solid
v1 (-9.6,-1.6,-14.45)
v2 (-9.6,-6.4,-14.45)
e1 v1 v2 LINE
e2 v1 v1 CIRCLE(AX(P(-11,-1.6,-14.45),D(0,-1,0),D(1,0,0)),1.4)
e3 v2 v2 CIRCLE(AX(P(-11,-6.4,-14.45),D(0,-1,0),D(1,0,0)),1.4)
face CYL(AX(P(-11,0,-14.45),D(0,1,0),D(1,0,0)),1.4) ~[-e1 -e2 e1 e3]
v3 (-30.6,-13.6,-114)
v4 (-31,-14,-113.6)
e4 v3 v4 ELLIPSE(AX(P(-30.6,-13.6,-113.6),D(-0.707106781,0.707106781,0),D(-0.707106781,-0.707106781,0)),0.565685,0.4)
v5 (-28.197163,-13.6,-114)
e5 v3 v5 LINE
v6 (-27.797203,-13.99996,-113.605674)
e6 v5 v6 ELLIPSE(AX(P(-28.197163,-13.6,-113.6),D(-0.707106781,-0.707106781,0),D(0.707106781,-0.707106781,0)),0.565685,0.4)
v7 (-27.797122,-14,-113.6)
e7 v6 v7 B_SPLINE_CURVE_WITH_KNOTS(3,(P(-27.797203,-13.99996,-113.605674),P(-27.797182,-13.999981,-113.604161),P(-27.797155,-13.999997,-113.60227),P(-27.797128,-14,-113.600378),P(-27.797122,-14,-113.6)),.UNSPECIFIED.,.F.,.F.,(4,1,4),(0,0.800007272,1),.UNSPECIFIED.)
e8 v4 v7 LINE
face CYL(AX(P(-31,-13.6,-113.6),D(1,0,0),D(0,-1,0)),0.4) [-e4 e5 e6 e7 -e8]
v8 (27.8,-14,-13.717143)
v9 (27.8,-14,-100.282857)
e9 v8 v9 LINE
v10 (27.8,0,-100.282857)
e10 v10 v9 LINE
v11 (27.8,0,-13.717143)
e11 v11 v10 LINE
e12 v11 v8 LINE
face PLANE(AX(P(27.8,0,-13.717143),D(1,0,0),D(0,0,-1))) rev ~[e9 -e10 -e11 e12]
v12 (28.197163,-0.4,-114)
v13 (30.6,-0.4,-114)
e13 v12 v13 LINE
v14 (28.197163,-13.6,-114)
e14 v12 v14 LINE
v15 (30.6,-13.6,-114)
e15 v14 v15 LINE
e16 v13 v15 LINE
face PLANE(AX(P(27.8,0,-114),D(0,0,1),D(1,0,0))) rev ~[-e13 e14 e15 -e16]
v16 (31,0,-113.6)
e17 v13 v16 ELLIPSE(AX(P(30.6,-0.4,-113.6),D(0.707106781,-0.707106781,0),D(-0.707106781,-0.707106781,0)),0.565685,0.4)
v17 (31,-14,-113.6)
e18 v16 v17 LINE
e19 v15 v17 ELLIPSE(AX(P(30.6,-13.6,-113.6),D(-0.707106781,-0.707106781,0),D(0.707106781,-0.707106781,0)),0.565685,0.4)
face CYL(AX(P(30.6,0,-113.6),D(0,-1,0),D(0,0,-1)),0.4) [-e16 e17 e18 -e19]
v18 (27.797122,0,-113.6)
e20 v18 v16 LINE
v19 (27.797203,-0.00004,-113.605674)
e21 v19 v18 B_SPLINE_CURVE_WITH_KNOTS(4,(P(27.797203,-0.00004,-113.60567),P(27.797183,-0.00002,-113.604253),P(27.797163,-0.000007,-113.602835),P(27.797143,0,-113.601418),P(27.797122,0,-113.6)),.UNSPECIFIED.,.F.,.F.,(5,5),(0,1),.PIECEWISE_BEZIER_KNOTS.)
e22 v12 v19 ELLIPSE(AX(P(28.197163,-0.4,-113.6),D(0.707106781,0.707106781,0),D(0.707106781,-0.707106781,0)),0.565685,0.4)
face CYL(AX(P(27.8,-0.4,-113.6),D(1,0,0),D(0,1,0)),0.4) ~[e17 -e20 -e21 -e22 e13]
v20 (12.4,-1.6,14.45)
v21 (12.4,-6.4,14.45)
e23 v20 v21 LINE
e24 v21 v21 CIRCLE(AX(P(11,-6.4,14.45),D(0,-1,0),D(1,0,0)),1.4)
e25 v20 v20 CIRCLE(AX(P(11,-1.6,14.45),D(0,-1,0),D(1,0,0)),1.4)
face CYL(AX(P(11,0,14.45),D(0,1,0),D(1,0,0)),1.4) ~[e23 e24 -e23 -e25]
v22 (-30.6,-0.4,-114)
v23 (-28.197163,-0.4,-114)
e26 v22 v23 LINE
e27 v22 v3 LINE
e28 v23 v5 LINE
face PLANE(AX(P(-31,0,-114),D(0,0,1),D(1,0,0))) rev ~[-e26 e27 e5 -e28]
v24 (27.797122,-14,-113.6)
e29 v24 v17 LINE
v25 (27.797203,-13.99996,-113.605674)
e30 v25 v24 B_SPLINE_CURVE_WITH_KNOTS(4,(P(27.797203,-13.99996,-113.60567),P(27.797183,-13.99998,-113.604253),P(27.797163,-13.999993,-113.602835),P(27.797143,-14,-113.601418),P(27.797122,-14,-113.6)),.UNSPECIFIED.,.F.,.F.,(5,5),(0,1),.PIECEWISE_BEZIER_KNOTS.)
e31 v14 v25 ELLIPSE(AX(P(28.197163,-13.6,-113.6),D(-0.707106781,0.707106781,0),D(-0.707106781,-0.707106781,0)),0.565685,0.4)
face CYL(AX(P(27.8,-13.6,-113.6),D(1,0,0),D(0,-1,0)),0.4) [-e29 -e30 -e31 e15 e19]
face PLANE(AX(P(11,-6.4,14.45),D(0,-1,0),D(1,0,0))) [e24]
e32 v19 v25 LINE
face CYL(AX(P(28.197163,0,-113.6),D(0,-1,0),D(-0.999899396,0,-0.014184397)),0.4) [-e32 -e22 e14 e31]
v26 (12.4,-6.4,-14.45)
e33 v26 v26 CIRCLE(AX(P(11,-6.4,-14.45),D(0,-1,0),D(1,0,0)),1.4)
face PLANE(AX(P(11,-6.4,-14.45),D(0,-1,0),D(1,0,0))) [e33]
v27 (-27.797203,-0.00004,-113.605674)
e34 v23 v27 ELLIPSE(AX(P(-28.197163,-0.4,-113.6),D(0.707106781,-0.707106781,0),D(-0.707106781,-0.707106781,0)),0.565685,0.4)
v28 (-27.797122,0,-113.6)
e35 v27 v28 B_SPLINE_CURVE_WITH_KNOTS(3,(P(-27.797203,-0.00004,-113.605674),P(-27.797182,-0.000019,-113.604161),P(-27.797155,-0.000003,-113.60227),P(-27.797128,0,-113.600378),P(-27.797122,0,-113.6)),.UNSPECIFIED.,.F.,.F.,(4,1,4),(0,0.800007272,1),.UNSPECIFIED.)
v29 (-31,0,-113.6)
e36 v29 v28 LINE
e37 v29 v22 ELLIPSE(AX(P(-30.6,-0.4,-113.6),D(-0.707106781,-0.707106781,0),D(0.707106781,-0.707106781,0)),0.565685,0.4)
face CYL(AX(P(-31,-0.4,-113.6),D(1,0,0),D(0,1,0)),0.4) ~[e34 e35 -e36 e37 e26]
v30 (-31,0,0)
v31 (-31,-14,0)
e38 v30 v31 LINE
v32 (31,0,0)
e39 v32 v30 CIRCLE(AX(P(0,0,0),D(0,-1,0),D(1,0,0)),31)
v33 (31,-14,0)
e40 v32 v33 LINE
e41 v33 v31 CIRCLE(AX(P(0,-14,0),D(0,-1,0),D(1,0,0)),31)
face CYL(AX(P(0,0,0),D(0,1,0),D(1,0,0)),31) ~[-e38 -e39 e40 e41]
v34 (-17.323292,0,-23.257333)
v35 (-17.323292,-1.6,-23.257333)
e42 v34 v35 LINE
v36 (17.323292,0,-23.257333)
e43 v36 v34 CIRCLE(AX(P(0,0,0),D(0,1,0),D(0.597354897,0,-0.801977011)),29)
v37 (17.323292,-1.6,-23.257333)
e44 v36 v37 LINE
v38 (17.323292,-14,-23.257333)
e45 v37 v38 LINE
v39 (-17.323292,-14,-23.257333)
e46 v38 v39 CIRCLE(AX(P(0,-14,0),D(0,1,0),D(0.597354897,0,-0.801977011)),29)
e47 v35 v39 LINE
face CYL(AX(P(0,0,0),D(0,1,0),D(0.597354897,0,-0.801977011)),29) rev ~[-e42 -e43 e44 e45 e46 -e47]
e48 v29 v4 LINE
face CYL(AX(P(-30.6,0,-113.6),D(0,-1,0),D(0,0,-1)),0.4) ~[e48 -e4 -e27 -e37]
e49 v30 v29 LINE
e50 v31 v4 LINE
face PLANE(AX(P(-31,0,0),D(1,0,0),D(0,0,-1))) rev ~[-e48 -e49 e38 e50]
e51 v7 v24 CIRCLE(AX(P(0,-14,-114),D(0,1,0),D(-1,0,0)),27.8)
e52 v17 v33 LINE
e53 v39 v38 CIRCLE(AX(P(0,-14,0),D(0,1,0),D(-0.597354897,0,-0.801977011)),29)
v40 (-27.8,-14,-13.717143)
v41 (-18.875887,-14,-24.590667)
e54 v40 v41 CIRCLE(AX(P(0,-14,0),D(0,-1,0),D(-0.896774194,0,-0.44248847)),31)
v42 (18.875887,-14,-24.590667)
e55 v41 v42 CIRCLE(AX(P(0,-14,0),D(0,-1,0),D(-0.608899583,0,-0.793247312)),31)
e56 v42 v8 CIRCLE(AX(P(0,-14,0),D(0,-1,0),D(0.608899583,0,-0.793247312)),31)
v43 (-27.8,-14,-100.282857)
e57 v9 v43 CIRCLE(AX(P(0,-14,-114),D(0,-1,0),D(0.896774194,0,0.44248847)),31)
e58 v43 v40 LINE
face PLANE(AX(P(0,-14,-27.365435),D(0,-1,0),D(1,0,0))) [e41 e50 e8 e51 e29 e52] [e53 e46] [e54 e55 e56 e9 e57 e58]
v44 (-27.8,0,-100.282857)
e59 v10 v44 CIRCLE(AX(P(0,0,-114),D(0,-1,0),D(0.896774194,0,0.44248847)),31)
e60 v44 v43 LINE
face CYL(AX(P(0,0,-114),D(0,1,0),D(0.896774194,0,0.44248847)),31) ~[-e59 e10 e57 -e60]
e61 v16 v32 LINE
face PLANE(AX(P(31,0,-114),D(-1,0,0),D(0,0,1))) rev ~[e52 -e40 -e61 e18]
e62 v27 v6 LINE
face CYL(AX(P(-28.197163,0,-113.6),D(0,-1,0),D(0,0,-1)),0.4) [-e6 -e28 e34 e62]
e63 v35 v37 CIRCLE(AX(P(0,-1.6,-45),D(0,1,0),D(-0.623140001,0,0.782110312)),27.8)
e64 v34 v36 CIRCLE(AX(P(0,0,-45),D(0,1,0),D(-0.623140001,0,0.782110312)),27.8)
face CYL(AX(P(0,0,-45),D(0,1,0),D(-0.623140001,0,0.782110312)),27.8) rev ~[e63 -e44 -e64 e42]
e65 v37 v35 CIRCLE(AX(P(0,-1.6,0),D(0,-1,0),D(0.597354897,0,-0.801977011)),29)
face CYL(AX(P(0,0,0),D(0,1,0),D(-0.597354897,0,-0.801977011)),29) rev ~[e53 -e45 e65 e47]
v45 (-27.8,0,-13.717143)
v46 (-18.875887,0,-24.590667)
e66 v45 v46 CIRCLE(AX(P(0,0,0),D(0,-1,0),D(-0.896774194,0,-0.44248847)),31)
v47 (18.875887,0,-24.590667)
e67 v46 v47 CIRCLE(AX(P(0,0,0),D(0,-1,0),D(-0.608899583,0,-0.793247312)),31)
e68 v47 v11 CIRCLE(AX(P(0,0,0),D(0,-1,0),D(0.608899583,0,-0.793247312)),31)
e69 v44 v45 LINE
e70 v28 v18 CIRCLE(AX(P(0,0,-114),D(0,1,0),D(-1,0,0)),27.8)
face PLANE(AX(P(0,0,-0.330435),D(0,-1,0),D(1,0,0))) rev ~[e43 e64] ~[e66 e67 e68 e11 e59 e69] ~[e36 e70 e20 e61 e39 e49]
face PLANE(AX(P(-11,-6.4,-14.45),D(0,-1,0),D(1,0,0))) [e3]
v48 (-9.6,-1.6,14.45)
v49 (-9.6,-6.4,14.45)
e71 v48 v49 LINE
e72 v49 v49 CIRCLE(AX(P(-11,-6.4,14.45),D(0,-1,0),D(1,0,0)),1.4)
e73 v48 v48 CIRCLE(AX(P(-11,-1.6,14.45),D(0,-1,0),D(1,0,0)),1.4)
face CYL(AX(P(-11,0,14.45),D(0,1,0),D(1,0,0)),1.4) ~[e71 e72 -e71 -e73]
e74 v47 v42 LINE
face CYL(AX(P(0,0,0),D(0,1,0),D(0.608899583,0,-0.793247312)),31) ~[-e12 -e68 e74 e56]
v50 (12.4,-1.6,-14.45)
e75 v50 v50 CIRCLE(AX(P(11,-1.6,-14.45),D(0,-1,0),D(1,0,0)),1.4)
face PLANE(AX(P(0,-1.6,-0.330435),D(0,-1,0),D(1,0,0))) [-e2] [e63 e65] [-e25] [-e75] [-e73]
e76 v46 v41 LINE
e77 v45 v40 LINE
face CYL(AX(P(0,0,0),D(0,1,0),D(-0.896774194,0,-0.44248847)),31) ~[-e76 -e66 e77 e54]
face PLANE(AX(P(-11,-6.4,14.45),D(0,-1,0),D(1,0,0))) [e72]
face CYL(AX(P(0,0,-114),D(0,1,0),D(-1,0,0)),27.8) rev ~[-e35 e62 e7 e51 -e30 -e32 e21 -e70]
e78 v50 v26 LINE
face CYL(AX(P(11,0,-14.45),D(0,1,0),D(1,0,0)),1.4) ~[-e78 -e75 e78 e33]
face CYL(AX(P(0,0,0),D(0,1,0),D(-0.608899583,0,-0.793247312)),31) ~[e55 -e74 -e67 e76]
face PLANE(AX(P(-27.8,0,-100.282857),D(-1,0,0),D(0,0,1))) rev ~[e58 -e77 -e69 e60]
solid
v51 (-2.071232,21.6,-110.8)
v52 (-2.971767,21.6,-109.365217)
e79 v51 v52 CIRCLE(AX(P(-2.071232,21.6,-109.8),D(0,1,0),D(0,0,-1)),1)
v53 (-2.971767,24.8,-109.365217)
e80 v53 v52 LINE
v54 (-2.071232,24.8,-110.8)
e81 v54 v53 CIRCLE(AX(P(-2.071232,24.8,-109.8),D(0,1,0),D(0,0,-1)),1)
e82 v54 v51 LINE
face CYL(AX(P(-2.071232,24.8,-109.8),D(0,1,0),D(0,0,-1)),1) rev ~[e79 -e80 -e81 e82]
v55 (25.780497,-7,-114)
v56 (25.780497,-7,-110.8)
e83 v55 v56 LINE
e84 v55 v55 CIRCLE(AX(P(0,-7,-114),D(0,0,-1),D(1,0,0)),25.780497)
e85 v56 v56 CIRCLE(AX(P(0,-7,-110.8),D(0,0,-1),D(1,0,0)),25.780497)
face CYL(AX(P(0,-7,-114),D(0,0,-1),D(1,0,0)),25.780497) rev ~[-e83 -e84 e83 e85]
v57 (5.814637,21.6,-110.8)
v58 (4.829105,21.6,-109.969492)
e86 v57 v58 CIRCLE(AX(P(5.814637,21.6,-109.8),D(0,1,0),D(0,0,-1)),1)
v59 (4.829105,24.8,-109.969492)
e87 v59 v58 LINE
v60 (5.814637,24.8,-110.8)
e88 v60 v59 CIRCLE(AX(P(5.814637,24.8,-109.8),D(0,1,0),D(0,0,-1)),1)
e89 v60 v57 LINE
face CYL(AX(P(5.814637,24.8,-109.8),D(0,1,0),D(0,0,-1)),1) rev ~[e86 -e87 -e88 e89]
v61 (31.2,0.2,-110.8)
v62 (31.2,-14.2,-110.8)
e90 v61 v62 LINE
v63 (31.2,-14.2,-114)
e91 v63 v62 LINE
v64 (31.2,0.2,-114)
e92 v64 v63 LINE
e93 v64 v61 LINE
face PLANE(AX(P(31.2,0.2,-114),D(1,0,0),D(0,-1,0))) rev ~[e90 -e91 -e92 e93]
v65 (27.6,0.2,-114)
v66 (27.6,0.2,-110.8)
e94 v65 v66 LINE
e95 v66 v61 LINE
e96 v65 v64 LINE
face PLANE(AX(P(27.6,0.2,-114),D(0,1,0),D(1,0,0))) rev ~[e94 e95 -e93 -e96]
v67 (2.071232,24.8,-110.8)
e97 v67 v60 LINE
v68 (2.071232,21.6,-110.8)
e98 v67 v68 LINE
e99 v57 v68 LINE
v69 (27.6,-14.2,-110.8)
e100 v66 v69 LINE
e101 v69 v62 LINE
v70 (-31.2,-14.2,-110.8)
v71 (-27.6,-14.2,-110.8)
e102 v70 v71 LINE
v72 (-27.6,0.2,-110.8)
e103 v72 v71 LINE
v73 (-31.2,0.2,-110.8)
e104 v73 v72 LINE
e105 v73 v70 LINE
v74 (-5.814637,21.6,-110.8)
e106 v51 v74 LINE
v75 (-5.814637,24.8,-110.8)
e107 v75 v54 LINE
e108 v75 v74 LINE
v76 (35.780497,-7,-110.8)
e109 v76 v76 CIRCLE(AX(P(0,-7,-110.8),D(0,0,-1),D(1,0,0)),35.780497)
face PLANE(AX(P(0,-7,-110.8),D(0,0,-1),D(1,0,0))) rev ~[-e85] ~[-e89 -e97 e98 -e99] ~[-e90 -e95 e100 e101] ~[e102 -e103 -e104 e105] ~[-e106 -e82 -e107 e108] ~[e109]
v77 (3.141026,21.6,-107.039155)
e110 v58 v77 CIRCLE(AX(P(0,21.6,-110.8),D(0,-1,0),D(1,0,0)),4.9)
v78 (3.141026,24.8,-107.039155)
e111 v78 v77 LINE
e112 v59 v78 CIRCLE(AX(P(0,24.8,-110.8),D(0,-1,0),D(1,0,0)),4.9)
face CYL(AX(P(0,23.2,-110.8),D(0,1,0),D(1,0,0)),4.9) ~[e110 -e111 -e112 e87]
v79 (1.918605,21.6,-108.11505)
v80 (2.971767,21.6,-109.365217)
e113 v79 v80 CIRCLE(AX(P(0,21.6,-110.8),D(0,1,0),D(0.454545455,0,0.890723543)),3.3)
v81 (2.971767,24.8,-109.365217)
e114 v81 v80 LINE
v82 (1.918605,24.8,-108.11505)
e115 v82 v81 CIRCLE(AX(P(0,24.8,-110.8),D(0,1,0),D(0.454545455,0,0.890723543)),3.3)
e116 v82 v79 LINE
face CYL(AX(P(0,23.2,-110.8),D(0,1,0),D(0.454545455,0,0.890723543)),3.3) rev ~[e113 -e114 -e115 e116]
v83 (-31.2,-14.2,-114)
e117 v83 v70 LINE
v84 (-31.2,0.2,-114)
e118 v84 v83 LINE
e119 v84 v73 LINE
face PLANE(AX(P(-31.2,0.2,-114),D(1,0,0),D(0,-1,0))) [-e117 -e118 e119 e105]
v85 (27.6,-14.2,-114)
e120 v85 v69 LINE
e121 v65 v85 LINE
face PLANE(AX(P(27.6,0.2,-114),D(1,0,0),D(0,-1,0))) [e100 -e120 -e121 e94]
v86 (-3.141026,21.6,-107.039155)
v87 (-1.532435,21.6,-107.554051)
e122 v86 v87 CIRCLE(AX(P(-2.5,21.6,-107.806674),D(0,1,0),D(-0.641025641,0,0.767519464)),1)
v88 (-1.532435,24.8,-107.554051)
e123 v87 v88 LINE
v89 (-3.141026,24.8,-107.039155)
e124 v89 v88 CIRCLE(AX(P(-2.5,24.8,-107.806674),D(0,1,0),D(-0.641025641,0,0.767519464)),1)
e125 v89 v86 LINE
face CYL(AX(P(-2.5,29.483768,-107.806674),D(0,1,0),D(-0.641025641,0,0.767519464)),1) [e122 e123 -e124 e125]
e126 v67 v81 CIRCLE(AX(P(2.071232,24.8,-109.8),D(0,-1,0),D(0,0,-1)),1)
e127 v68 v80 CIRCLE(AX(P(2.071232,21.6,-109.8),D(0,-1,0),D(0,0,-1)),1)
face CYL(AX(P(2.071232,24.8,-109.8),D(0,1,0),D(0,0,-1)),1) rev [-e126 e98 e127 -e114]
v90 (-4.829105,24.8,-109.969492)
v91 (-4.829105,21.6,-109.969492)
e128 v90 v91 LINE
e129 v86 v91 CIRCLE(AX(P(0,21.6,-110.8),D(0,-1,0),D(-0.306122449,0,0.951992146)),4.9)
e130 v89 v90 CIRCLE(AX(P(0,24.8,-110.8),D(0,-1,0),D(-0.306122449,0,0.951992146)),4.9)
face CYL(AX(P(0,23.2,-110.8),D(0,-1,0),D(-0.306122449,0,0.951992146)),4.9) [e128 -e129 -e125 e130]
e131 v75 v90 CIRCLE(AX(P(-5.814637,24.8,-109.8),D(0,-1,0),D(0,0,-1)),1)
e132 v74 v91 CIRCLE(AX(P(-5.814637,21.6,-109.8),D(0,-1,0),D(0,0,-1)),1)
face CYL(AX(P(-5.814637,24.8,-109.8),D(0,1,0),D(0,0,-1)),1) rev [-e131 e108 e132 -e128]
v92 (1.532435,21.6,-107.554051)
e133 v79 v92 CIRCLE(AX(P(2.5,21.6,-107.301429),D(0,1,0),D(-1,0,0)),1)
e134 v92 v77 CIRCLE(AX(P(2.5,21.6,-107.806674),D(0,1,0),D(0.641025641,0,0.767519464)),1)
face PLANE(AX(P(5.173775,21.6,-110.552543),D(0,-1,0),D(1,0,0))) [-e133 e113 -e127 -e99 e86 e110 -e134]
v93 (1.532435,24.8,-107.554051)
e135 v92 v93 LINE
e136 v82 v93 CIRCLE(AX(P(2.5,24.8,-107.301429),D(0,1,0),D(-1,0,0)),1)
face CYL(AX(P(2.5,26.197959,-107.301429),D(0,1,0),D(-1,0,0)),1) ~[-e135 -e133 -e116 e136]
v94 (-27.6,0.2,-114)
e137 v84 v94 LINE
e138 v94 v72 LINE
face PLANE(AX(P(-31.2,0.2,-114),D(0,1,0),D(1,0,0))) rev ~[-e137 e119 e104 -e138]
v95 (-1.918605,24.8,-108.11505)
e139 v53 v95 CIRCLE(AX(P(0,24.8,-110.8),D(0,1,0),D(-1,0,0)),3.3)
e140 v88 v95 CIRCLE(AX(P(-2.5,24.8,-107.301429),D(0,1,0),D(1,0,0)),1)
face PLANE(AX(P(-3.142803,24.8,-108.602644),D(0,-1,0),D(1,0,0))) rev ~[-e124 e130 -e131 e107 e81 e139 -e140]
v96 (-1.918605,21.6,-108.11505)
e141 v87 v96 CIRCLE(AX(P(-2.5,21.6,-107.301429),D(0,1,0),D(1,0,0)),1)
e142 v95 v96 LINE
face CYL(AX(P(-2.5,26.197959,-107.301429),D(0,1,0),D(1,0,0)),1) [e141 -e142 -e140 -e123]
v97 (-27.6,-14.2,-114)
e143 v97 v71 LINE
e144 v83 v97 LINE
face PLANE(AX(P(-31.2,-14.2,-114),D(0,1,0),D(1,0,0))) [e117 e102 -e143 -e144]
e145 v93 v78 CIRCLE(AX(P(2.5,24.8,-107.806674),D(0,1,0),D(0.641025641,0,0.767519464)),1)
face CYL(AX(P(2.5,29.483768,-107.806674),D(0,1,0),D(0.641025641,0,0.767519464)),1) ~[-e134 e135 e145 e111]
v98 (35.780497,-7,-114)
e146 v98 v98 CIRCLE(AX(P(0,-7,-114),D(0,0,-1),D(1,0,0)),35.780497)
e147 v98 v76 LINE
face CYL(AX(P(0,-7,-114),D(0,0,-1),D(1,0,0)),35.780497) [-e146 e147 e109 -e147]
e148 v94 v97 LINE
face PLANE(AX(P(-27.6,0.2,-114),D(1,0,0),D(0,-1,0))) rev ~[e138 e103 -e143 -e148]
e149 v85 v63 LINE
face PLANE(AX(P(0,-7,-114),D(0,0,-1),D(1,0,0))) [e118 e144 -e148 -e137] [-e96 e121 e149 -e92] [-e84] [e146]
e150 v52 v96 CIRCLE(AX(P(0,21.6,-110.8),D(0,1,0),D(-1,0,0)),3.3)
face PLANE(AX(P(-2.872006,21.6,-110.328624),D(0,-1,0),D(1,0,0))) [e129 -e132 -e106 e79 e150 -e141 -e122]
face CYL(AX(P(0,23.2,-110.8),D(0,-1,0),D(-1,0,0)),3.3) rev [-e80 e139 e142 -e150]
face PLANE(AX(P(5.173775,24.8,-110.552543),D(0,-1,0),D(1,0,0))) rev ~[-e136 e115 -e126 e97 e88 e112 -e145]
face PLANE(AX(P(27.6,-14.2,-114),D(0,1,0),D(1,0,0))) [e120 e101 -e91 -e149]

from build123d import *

# Parameters (mm, degrees)
F1_DEPTH    = 14
F0_R        = 1.4
F2_DEPTH    = 1.6
F3_DEPTH    = 6.4
F4_R        = 35.7804971641
F4_W        = 3.6
F4_H        = 14.4
F4_R_2      = 25.7804971641
F5_DEPTH    = 3.2
F8_DEPTH    = 1.6
F9_T1_DEPTH = 3.2
F9_T3_DEPTH = 5.9959172278
F9_T5_DEPTH = 12.5675364253
F10_R       = 0.4


# Not quite as in the source:
# - a fillet or chamfer that OpenCascade refuses, or shapes differently, is made with other operations: its cross-section is extruded or revolved along the edge and cut away or added


with BuildPart() as f1:
    # F0 (on Front) → F1 (new body)
    with BuildSketch(Plane.XZ):
        with BuildLine():
            ThreePointArc((17.3232920146, -23.2573333333), (0, -29), (-17.3232920146, -23.2573333333))
            ThreePointArc((-17.3232920146, -23.2573333333), (-18.1118631329, -23.9097080661), (-18.8758870755, -24.5906666667))
            ThreePointArc((-18.8758870755, -24.5906666667), (0, -31), (18.8758870755, -24.5906666667))
            ThreePointArc((18.8758870755, -24.5906666667), (18.1118631329, -23.9097080661), (17.3232920146, -23.2573333333))
        make_face()
        with BuildLine():
            ThreePointArc((-17.3232920146, -23.2573333333), (-13.0120046799, 25.9169391366), (29, 0))
            ThreePointArc((29, 0), (25.9169391366, -13.0120046799), (17.3232920146, -23.2573333333))
            ThreePointArc((17.3232920146, -23.2573333333), (18.1118631329, -23.9097080661), (18.8758870755, -24.5906666667))
            ThreePointArc((18.8758870755, -24.5906666667), (23.9628460371, -19.6667742602), (27.8, -13.7171425596))
            Line((27.8, -13.7171425596), (27.8, -45))
            Line((27.8, -45), (27.8, -100.2828574404))
            Line((27.8, -100.2828574404), (27.8, -114))
            Line((27.8, -114), (31, -114))
            Line((31, -114), (31, 0))
            ThreePointArc((31, 0), (0, 31), (-31, 0))
            Line((-31, 0), (-31, -114))
            Line((-31, -114), (-27.8, -114))
            Line((-27.8, -114), (-27.8, -100.2828574404))
            Line((-27.8, -100.2828574404), (-27.8, -45))
            Line((-27.8, -45), (-27.8, -13.7171425596))
            ThreePointArc((-27.8, -13.7171425596), (-23.9628460371, -19.6667742602), (-18.8758870755, -24.5906666667))
            ThreePointArc((-18.8758870755, -24.5906666667), (-18.1118631329, -23.9097080661), (-17.3232920146, -23.2573333333))
        make_face()
        with BuildLine():
            ThreePointArc((27.8, -100.2828574404), (0, -83), (-27.8, -100.2828574404))
            Line((-27.8, -100.2828574404), (-27.8, -114))
            ThreePointArc((-27.8, -114), (0, -86.2), (27.8, -114))
            Line((27.8, -114), (27.8, -100.2828574404))
        make_face()
    extrude(amount=F1_DEPTH)

    # F0 (on Front) → F2 (join)
    with BuildSketch(Plane.XZ):
        with BuildLine():
            ThreePointArc((17.3232920146, -23.2573333333), (25.9169391366, -13.0120046799), (29, 0))
            ThreePointArc((29, 0), (-13.0120046799, 25.9169391366), (-17.3232920146, -23.2573333333))
            ThreePointArc((-17.3232920146, -23.2573333333), (0, -17.2), (17.3232920146, -23.2573333333))
        make_face()
        with Locations((-11, -14.45)):
            Circle(F0_R, mode=Mode.SUBTRACT)
        with Locations((-11, 14.45)):
            Circle(F0_R, mode=Mode.SUBTRACT)
        with Locations((11, -14.45)):
            Circle(F0_R, mode=Mode.SUBTRACT)
        with Locations((11, 14.45)):
            Circle(F0_R, mode=Mode.SUBTRACT)
    extrude(amount=F2_DEPTH)

    # F0 (on Front) → F3 (join)
    with BuildSketch(Plane.XZ):
        with Locations((11, -14.45)):
            Circle(F0_R)
        with Locations((-11, -14.45)):
            Circle(F0_R)
        with Locations((-11, 14.45)):
            Circle(F0_R)
        with Locations((11, 14.45)):
            Circle(F0_R)
    extrude(amount=F3_DEPTH)

    # F10
    f10_edges = [f1.edges().sort_by_distance(p)[0] for p in [
        (27.8, -7, -114),
        (31, -7, -114),
        (29.4, -14, -114),
        (29.4, 0, -114),
        (-29.4, 0, -114),
        (-31, -7, -114),
        (-27.8, -7, -114),
        (-29.4, -14, -114),
    ]]
    fillet(f10_edges, radius=F10_R)


with BuildPart() as f5:
    # F4 (on face) → F5 (new body)
    with BuildSketch(Plane(origin=(0, 0, -114), x_dir=(1, 0, 0), z_dir=(0, 0, -1))):
        with Locations((0, 7)):
            Circle(F4_R)
        with Locations((-29.4, 7)):
            Rectangle(F4_W, F4_H, mode=Mode.SUBTRACT)
        with Locations((0, 7)):
            Circle(F4_R_2, mode=Mode.SUBTRACT)
        with Locations((29.4, 7)):
            Rectangle(F4_W, F4_H, mode=Mode.SUBTRACT)
    extrude(amount=-F5_DEPTH)

    # F7 (on offset) → F8 (join, symmetric)
    with BuildSketch(Plane.XZ.offset(-23.2)):
        with BuildLine():
            ThreePointArc((1.5, -107.8606123087), (2.8142494559, -109.076631206), (3.3, -110.8))
            Line((3.3, -110.8), (4.9, -110.8))
            ThreePointArc((4.9, -110.8), (3.9597979746, -107.9138260621), (1.5, -106.1352384841))
            Line((1.5, -106.1352384841), (1.5, -107.8606123087))
        make_face()
        with BuildLine():
            Line((-4.9, -110.8), (-3.3, -110.8))
            ThreePointArc((-3.3, -110.8), (-2.8142494559, -109.076631206), (-1.5, -107.8606123087))
            Line((-1.5, -107.8606123087), (-1.5, -106.1352384841))
            ThreePointArc((-1.5, -106.1352384841), (-3.9597979746, -107.9138260621), (-4.9, -110.8))
        make_face()
    extrude(amount=F8_DEPTH, both=True)

    # F9: fillet of radius 1 on 8 edges, made by hand

    # F9_s2 → F9_t1 (join)
    with BuildSketch(Plane.XZ.offset(-24.8)):
        with BuildLine():
            ThreePointArc((5.814636704, -110.8), (5.1702344715, -110.5646867089), (4.8291050593, -109.9694915254))
            ThreePointArc((4.8291050593, -109.9694915254), (4.8822440942, -110.3832355525), (4.9, -110.8))
            Line((4.9, -110.8), (5.814636704, -110.8))
        make_face()
        with BuildLine():
            ThreePointArc((-5.814636704, -110.8), (-5.1702344715, -110.5646867089), (-4.8291050593, -109.9694915254))
            ThreePointArc((-4.8291050593, -109.9694915254), (-4.8822440942, -110.3832355525), (-4.9, -110.8))
            Line((-4.9, -110.8), (-5.814636704, -110.8))
        make_face()
        with BuildLine():
            ThreePointArc((2.0712315177, -110.8), (2.9182210716, -110.3316095331), (2.9717669602, -109.3652173913))
            ThreePointArc((2.9717669602, -109.3652173913), (3.2168953176, -110.0640757405), (3.3, -110.8))
            Line((3.3, -110.8), (2.0712315177, -110.8))
        make_face()
        with BuildLine():
            ThreePointArc((-2.0712315177, -110.8), (-2.9182210716, -110.3316095331), (-2.9717669602, -109.3652173913))
            ThreePointArc((-2.9717669602, -109.3652173913), (-3.2168953176, -110.0640757405), (-3.3, -110.8))
            Line((-3.3, -110.8), (-2.0712315177, -110.8))
        make_face()
    extrude(amount=F9_T1_DEPTH)

    # F9_s4 → F9_t3 (cut)
    with BuildSketch(Plane.XZ.offset(-26.1979586139)):
        with BuildLine():
            ThreePointArc((1.5, -107.3014288631), (1.6107881724, -107.7589245741), (1.9186046512, -108.1150500577))
            ThreePointArc((1.9186046512, -108.1150500577), (1.7140300704, -107.9800530293), (1.5, -107.8606123087))
            Line((1.5, -107.8606123087), (1.5, -107.3014288631))
        make_face()
        with BuildLine():
            ThreePointArc((-1.5, -107.3014288631), (-1.6107881724, -107.7589245741), (-1.9186046512, -108.1150500577))
            ThreePointArc((-1.9186046512, -108.1150500577), (-1.7140300704, -107.9800530293), (-1.5, -107.8606123087))
            Line((-1.5, -107.8606123087), (-1.5, -107.3014288631))
        make_face()
    extrude(amount=F9_T3_DEPTH, mode=Mode.SUBTRACT)

    # F9_s6 → F9_t5 (cut)
    with BuildSketch(Plane.XZ.offset(-29.4837682127)):
        with BuildLine():
            ThreePointArc((3.141025641, -107.0391546266), (2.0763407271, -106.9008524633), (1.5, -107.8066740906))
            Line((1.5, -107.8066740906), (1.5, -106.1352384841))
            ThreePointArc((1.5, -106.1352384841), (2.3641162933, -106.5080360962), (3.141025641, -107.0391546266))
        make_face()
        with BuildLine():
            ThreePointArc((-3.141025641, -107.0391546266), (-2.0763407271, -106.9008524633), (-1.5, -107.8066740906))
            Line((-1.5, -107.8066740906), (-1.5, -106.1352384841))
            ThreePointArc((-1.5, -106.1352384841), (-2.3641162933, -106.5080360962), (-3.141025641, -107.0391546266))
        make_face()
    extrude(amount=F9_T5_DEPTH, mode=Mode.SUBTRACT)


solid = Compound([f1.part, f5.part])
